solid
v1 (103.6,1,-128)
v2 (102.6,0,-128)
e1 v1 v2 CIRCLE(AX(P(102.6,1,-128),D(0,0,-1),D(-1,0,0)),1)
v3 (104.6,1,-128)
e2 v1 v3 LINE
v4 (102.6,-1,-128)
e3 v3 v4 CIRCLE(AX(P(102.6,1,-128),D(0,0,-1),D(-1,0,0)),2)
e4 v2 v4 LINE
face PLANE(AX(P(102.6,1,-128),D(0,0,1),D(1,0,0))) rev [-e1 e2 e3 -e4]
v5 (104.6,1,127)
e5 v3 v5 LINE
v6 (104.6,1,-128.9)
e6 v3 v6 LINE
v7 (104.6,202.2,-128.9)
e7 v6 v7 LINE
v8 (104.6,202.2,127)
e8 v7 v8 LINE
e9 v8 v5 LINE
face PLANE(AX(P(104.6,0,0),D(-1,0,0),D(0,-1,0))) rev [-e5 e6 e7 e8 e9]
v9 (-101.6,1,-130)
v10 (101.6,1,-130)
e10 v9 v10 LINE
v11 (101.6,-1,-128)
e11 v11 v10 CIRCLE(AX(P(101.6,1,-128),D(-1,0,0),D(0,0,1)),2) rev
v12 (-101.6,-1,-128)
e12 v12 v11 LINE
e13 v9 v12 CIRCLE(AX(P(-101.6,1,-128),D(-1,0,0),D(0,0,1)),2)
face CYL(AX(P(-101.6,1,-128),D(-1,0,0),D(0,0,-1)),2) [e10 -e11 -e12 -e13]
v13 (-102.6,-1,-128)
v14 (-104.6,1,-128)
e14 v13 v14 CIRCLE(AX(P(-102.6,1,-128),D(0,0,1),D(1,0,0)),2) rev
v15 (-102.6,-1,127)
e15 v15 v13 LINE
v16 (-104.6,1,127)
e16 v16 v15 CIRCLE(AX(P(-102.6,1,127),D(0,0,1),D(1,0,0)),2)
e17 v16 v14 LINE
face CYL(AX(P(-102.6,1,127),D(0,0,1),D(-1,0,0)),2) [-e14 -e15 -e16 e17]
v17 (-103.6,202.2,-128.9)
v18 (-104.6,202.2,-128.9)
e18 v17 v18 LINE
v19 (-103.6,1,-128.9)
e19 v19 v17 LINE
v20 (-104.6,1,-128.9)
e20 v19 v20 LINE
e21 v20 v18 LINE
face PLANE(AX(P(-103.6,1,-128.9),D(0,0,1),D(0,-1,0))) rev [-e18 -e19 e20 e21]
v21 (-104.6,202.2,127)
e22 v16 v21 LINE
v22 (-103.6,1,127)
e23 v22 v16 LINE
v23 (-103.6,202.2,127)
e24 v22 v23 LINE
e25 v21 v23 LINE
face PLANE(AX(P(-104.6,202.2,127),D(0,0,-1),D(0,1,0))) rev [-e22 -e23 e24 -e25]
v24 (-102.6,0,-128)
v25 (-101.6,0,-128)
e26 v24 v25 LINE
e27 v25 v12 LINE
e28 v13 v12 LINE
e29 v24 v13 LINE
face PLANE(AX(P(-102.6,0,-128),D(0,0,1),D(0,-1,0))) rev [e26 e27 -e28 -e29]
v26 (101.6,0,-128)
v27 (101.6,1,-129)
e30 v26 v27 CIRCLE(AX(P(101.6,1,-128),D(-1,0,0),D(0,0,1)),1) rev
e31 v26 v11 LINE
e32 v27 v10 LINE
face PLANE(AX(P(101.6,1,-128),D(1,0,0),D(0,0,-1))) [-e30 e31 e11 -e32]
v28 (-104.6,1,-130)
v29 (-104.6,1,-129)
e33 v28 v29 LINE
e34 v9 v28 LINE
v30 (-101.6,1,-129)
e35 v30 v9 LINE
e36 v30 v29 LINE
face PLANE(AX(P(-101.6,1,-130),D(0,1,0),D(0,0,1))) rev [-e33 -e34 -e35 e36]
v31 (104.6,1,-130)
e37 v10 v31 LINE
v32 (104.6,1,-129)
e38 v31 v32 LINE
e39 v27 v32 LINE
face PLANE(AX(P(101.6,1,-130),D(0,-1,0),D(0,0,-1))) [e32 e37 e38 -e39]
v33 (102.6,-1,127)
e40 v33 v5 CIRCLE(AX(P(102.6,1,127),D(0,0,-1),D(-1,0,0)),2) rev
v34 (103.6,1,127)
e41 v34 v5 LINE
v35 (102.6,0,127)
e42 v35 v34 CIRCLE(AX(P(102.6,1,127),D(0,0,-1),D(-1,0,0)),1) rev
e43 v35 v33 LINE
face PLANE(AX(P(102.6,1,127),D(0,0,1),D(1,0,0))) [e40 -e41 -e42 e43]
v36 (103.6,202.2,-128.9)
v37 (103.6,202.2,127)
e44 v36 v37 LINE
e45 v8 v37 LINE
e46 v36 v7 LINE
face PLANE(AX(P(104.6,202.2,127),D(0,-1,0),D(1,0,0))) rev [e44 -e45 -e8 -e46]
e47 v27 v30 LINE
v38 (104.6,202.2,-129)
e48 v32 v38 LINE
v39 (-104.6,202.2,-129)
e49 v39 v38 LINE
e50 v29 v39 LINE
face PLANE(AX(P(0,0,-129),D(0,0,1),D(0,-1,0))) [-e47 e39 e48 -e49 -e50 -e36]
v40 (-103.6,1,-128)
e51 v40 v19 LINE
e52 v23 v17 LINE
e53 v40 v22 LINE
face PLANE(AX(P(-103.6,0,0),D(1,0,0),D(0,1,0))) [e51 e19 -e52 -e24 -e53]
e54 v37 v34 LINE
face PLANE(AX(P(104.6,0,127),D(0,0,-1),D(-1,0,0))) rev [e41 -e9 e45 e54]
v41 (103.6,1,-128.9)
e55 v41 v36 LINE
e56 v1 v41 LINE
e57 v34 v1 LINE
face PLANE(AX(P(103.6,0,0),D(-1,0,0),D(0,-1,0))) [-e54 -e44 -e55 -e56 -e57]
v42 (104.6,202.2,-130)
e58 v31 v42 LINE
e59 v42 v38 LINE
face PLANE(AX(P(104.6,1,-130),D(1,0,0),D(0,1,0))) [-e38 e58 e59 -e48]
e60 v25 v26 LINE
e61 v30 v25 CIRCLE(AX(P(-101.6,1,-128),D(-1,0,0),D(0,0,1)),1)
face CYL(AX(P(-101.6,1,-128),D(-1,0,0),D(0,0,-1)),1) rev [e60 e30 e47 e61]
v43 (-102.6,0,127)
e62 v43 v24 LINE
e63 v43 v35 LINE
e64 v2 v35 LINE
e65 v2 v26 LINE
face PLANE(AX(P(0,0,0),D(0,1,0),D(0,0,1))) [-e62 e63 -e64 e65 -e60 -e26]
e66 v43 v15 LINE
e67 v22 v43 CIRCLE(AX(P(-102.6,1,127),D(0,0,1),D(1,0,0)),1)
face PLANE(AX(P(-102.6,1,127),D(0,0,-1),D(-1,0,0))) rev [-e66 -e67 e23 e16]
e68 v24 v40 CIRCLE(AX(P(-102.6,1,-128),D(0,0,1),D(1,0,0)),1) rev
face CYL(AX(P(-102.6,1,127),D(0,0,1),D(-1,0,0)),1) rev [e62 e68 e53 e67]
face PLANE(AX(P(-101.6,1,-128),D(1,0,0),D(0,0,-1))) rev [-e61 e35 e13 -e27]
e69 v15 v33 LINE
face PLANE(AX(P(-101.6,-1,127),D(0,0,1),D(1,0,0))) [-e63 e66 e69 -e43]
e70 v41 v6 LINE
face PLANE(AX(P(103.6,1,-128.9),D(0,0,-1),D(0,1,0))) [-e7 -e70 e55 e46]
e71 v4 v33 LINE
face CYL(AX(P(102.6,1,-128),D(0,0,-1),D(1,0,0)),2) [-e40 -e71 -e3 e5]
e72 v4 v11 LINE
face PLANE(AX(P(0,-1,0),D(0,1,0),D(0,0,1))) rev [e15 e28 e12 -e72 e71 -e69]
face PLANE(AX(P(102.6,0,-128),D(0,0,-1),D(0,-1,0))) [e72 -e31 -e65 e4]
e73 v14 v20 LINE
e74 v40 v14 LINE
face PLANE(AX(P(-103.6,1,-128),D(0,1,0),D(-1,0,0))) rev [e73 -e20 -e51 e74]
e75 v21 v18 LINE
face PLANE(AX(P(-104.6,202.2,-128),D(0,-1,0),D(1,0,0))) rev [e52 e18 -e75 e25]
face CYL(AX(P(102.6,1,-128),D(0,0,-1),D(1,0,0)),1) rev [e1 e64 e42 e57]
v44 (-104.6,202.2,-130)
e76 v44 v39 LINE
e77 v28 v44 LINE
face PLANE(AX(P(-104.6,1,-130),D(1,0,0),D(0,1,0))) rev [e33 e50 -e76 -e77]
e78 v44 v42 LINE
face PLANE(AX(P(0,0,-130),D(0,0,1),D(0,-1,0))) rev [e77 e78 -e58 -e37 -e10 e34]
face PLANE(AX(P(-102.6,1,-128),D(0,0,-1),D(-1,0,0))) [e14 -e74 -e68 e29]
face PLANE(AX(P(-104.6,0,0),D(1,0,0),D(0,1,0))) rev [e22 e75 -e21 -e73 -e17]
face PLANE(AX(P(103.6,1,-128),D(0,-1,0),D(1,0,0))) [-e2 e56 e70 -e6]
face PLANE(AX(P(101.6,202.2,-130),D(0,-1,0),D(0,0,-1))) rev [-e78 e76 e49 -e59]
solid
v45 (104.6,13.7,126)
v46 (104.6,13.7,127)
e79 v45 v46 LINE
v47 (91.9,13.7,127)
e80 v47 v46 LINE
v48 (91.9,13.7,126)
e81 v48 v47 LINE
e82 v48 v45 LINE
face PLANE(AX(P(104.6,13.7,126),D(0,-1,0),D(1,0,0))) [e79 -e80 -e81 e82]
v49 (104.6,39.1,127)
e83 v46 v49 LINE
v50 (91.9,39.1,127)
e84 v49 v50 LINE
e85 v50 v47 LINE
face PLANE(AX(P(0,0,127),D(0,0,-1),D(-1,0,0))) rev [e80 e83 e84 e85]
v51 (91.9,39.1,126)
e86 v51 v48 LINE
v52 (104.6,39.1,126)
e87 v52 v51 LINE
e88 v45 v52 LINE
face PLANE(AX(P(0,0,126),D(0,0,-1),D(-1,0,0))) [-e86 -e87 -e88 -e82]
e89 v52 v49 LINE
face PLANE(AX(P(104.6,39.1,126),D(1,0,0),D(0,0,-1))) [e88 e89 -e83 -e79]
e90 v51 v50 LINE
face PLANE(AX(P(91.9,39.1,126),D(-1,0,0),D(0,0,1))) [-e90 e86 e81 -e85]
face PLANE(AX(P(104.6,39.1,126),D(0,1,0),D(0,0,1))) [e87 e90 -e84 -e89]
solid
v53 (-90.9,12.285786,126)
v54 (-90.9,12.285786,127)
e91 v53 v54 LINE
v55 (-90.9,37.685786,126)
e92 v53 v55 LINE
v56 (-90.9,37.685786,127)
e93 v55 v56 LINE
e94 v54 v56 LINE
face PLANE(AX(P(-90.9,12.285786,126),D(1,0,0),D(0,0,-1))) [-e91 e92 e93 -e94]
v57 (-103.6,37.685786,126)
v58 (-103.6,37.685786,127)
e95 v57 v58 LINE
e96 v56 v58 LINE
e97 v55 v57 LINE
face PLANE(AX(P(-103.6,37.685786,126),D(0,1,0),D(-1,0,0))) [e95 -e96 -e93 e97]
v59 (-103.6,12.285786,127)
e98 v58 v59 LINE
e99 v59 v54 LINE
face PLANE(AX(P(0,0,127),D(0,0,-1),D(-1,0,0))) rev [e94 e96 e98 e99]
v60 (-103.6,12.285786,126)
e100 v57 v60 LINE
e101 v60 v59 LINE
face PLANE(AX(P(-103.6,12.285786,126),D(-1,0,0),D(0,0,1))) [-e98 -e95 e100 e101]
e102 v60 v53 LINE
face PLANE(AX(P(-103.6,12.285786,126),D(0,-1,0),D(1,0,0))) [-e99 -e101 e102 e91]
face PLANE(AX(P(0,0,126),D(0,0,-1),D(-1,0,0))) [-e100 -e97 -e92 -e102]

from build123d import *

# Parameters (mm, degrees)
SKETCH1_W                   = 203.2
SKETCH1_H                   = 254
BASE_FLANGE1_DEPTH          = 1
EDGE_FLANGE1_DEPTH          = 203.2
EDGE_FLANGE2_DEPTH          = 255
EDGE_FLANGE3_DEPTH          = 255
CLOSED_START                = -104.6
CLOSED_CORNER13_OUTLINE_W   = 201.2
CLOSED_CORNER13_OUTLINE_H   = 1
CLOSED_CORNER13_DEPTH       = 3
CLOSED_CORNER13_2_OUTLINE_W = 201.2
CLOSED_CORNER13_2_OUTLINE_H = 0.9
CLOSED_CORNER13_2_DEPTH     = 1
CLOSED_START_2              = 101.6
CLOSED_CORNER14_OUTLINE_W   = 201.2
CLOSED_CORNER14_OUTLINE_H   = 1
CLOSED_CORNER14_DEPTH       = 3
CLOSED_START_3              = 103.6
CLOSED_CORNER14_2_OUTLINE_W = 201.2
CLOSED_CORNER14_2_OUTLINE_H = 0.9
CLOSED_CORNER14_2_DEPTH     = 1
SKETCH26_W                  = 12.7
SKETCH26_H                  = 25.4
BASE_FLANGE3_DEPTH          = 1
SKETCH31_W                  = 12.7
SKETCH31_H                  = 25.4
BASE_FLANGE4_DEPTH          = 1


# Read off the part's stored shape, not the designer's step: Closed Corner13, Closed Corner14
# Sheet-metal steps are written as plain solids
with BuildPart() as part:
    # Sketch1 → Base-Flange1 (new body)
    with BuildSketch(Plane(origin=(0, 0, 0), x_dir=(1, 0, 0), z_dir=(0, 1, 0))):
        Rectangle(SKETCH1_W, SKETCH1_H)
    extrude(amount=-BASE_FLANGE1_DEPTH)

    # Edge-Flange1 section (across the edge) → Edge-Flange1 (add)
    with BuildSketch(Plane(origin=(101.6, 0, -130), x_dir=(0, 0, 1), z_dir=(-1, 0, 0))):
        with BuildLine():
            Line((0, 1), (0, 202.2))
            Line((0, 202.2), (1, 202.2))
            Line((1, 202.2), (1, 1))
            ThreePointArc((1, 1), (1.292893219, 0.292893219), (2, 0))
            Line((2, 0), (3, 0))
            Line((3, 0), (3, -1))
            Line((3, -1), (2, -1))
            ThreePointArc((2, -1), (0.585786438, -0.414213562), (0, 1))
        make_face()
    extrude(amount=EDGE_FLANGE1_DEPTH)

    # Edge-Flange2 section (across the edge) → Edge-Flange2 (add)
    with BuildSketch(Plane(origin=(-104.6, 0, -128), x_dir=(1, 0, 0), z_dir=(0, 0, 1))):
        with BuildLine():
            Line((0, 1), (0, 202.2))
            Line((0, 202.2), (1, 202.2))
            Line((1, 202.2), (1, 1))
            ThreePointArc((1, 1), (1.292893219, 0.292893219), (2, 0))
            Line((2, 0), (3, 0))
            Line((3, 0), (3, -1))
            Line((3, -1), (2, -1))
            ThreePointArc((2, -1), (0.585786438, -0.414213562), (0, 1))
        make_face()
    extrude(amount=EDGE_FLANGE2_DEPTH)

    # Edge-Flange3 section (across the edge) → Edge-Flange3 (add)
    with BuildSketch(Plane(origin=(104.6, 0, 127), x_dir=(-1, 0, 0), z_dir=(0, 0, -1))):
        with BuildLine():
            Line((0, 1), (0, 202.2))
            Line((0, 202.2), (1, 202.2))
            Line((1, 202.2), (1, 1))
            ThreePointArc((1, 1), (1.292893219, 0.292893219), (2, 0))
            Line((2, 0), (3, 0))
            Line((3, 0), (3, -1))
            Line((3, -1), (2, -1))
            ThreePointArc((2, -1), (0.585786438, -0.414213562), (0, 1))
        make_face()
    extrude(amount=EDGE_FLANGE3_DEPTH)

    # Closed Corner13 outline → Closed Corner13 (add)
    with BuildSketch(Plane.YZ.offset(CLOSED_START)):
        with Locations((101.6, -129.5)):
            Rectangle(CLOSED_CORNER13_OUTLINE_W, CLOSED_CORNER13_OUTLINE_H)
    extrude(amount=CLOSED_CORNER13_DEPTH)

    # Closed Corner13 2 outline → Closed Corner13 2 (add)
    with BuildSketch(Plane.YZ.offset(CLOSED_START)):
        with Locations((101.6, -128.45)):
            Rectangle(CLOSED_CORNER13_2_OUTLINE_W, CLOSED_CORNER13_2_OUTLINE_H)
    extrude(amount=CLOSED_CORNER13_2_DEPTH)

    # Closed Corner14 outline → Closed Corner14 (add)
    with BuildSketch(Plane.YZ.offset(CLOSED_START_2)):
        with Locations((101.6, -129.5)):
            Rectangle(CLOSED_CORNER14_OUTLINE_W, CLOSED_CORNER14_OUTLINE_H)
    extrude(amount=CLOSED_CORNER14_DEPTH)

    # Closed Corner14 2 outline → Closed Corner14 2 (add)
    with BuildSketch(Plane.YZ.offset(CLOSED_START_3)):
        with Locations((101.6, -128.45)):
            Rectangle(CLOSED_CORNER14_2_OUTLINE_W, CLOSED_CORNER14_2_OUTLINE_H)
    extrude(amount=CLOSED_CORNER14_2_DEPTH)


with BuildPart() as body_2:
    # Sketch26 → Base-Flange3 (new body)
    with BuildSketch(Plane(origin=(104.6, 1, 127), x_dir=(1, 0, 0), z_dir=(0, 0, 1))):
        with Locations((-6.35, 25.4)):
            Rectangle(SKETCH26_W, SKETCH26_H)
    extrude(amount=-BASE_FLANGE3_DEPTH)


with BuildPart() as body_3:
    # Sketch31 → Base-Flange4 (new body)
    with BuildSketch(Plane.XY.offset(127)):
        with Locations((-97.25, 24.985786438)):
            Rectangle(SKETCH31_W, SKETCH31_H)
    extrude(amount=-BASE_FLANGE4_DEPTH)


solid = Compound([part.part, body_2.part, body_3.part])
